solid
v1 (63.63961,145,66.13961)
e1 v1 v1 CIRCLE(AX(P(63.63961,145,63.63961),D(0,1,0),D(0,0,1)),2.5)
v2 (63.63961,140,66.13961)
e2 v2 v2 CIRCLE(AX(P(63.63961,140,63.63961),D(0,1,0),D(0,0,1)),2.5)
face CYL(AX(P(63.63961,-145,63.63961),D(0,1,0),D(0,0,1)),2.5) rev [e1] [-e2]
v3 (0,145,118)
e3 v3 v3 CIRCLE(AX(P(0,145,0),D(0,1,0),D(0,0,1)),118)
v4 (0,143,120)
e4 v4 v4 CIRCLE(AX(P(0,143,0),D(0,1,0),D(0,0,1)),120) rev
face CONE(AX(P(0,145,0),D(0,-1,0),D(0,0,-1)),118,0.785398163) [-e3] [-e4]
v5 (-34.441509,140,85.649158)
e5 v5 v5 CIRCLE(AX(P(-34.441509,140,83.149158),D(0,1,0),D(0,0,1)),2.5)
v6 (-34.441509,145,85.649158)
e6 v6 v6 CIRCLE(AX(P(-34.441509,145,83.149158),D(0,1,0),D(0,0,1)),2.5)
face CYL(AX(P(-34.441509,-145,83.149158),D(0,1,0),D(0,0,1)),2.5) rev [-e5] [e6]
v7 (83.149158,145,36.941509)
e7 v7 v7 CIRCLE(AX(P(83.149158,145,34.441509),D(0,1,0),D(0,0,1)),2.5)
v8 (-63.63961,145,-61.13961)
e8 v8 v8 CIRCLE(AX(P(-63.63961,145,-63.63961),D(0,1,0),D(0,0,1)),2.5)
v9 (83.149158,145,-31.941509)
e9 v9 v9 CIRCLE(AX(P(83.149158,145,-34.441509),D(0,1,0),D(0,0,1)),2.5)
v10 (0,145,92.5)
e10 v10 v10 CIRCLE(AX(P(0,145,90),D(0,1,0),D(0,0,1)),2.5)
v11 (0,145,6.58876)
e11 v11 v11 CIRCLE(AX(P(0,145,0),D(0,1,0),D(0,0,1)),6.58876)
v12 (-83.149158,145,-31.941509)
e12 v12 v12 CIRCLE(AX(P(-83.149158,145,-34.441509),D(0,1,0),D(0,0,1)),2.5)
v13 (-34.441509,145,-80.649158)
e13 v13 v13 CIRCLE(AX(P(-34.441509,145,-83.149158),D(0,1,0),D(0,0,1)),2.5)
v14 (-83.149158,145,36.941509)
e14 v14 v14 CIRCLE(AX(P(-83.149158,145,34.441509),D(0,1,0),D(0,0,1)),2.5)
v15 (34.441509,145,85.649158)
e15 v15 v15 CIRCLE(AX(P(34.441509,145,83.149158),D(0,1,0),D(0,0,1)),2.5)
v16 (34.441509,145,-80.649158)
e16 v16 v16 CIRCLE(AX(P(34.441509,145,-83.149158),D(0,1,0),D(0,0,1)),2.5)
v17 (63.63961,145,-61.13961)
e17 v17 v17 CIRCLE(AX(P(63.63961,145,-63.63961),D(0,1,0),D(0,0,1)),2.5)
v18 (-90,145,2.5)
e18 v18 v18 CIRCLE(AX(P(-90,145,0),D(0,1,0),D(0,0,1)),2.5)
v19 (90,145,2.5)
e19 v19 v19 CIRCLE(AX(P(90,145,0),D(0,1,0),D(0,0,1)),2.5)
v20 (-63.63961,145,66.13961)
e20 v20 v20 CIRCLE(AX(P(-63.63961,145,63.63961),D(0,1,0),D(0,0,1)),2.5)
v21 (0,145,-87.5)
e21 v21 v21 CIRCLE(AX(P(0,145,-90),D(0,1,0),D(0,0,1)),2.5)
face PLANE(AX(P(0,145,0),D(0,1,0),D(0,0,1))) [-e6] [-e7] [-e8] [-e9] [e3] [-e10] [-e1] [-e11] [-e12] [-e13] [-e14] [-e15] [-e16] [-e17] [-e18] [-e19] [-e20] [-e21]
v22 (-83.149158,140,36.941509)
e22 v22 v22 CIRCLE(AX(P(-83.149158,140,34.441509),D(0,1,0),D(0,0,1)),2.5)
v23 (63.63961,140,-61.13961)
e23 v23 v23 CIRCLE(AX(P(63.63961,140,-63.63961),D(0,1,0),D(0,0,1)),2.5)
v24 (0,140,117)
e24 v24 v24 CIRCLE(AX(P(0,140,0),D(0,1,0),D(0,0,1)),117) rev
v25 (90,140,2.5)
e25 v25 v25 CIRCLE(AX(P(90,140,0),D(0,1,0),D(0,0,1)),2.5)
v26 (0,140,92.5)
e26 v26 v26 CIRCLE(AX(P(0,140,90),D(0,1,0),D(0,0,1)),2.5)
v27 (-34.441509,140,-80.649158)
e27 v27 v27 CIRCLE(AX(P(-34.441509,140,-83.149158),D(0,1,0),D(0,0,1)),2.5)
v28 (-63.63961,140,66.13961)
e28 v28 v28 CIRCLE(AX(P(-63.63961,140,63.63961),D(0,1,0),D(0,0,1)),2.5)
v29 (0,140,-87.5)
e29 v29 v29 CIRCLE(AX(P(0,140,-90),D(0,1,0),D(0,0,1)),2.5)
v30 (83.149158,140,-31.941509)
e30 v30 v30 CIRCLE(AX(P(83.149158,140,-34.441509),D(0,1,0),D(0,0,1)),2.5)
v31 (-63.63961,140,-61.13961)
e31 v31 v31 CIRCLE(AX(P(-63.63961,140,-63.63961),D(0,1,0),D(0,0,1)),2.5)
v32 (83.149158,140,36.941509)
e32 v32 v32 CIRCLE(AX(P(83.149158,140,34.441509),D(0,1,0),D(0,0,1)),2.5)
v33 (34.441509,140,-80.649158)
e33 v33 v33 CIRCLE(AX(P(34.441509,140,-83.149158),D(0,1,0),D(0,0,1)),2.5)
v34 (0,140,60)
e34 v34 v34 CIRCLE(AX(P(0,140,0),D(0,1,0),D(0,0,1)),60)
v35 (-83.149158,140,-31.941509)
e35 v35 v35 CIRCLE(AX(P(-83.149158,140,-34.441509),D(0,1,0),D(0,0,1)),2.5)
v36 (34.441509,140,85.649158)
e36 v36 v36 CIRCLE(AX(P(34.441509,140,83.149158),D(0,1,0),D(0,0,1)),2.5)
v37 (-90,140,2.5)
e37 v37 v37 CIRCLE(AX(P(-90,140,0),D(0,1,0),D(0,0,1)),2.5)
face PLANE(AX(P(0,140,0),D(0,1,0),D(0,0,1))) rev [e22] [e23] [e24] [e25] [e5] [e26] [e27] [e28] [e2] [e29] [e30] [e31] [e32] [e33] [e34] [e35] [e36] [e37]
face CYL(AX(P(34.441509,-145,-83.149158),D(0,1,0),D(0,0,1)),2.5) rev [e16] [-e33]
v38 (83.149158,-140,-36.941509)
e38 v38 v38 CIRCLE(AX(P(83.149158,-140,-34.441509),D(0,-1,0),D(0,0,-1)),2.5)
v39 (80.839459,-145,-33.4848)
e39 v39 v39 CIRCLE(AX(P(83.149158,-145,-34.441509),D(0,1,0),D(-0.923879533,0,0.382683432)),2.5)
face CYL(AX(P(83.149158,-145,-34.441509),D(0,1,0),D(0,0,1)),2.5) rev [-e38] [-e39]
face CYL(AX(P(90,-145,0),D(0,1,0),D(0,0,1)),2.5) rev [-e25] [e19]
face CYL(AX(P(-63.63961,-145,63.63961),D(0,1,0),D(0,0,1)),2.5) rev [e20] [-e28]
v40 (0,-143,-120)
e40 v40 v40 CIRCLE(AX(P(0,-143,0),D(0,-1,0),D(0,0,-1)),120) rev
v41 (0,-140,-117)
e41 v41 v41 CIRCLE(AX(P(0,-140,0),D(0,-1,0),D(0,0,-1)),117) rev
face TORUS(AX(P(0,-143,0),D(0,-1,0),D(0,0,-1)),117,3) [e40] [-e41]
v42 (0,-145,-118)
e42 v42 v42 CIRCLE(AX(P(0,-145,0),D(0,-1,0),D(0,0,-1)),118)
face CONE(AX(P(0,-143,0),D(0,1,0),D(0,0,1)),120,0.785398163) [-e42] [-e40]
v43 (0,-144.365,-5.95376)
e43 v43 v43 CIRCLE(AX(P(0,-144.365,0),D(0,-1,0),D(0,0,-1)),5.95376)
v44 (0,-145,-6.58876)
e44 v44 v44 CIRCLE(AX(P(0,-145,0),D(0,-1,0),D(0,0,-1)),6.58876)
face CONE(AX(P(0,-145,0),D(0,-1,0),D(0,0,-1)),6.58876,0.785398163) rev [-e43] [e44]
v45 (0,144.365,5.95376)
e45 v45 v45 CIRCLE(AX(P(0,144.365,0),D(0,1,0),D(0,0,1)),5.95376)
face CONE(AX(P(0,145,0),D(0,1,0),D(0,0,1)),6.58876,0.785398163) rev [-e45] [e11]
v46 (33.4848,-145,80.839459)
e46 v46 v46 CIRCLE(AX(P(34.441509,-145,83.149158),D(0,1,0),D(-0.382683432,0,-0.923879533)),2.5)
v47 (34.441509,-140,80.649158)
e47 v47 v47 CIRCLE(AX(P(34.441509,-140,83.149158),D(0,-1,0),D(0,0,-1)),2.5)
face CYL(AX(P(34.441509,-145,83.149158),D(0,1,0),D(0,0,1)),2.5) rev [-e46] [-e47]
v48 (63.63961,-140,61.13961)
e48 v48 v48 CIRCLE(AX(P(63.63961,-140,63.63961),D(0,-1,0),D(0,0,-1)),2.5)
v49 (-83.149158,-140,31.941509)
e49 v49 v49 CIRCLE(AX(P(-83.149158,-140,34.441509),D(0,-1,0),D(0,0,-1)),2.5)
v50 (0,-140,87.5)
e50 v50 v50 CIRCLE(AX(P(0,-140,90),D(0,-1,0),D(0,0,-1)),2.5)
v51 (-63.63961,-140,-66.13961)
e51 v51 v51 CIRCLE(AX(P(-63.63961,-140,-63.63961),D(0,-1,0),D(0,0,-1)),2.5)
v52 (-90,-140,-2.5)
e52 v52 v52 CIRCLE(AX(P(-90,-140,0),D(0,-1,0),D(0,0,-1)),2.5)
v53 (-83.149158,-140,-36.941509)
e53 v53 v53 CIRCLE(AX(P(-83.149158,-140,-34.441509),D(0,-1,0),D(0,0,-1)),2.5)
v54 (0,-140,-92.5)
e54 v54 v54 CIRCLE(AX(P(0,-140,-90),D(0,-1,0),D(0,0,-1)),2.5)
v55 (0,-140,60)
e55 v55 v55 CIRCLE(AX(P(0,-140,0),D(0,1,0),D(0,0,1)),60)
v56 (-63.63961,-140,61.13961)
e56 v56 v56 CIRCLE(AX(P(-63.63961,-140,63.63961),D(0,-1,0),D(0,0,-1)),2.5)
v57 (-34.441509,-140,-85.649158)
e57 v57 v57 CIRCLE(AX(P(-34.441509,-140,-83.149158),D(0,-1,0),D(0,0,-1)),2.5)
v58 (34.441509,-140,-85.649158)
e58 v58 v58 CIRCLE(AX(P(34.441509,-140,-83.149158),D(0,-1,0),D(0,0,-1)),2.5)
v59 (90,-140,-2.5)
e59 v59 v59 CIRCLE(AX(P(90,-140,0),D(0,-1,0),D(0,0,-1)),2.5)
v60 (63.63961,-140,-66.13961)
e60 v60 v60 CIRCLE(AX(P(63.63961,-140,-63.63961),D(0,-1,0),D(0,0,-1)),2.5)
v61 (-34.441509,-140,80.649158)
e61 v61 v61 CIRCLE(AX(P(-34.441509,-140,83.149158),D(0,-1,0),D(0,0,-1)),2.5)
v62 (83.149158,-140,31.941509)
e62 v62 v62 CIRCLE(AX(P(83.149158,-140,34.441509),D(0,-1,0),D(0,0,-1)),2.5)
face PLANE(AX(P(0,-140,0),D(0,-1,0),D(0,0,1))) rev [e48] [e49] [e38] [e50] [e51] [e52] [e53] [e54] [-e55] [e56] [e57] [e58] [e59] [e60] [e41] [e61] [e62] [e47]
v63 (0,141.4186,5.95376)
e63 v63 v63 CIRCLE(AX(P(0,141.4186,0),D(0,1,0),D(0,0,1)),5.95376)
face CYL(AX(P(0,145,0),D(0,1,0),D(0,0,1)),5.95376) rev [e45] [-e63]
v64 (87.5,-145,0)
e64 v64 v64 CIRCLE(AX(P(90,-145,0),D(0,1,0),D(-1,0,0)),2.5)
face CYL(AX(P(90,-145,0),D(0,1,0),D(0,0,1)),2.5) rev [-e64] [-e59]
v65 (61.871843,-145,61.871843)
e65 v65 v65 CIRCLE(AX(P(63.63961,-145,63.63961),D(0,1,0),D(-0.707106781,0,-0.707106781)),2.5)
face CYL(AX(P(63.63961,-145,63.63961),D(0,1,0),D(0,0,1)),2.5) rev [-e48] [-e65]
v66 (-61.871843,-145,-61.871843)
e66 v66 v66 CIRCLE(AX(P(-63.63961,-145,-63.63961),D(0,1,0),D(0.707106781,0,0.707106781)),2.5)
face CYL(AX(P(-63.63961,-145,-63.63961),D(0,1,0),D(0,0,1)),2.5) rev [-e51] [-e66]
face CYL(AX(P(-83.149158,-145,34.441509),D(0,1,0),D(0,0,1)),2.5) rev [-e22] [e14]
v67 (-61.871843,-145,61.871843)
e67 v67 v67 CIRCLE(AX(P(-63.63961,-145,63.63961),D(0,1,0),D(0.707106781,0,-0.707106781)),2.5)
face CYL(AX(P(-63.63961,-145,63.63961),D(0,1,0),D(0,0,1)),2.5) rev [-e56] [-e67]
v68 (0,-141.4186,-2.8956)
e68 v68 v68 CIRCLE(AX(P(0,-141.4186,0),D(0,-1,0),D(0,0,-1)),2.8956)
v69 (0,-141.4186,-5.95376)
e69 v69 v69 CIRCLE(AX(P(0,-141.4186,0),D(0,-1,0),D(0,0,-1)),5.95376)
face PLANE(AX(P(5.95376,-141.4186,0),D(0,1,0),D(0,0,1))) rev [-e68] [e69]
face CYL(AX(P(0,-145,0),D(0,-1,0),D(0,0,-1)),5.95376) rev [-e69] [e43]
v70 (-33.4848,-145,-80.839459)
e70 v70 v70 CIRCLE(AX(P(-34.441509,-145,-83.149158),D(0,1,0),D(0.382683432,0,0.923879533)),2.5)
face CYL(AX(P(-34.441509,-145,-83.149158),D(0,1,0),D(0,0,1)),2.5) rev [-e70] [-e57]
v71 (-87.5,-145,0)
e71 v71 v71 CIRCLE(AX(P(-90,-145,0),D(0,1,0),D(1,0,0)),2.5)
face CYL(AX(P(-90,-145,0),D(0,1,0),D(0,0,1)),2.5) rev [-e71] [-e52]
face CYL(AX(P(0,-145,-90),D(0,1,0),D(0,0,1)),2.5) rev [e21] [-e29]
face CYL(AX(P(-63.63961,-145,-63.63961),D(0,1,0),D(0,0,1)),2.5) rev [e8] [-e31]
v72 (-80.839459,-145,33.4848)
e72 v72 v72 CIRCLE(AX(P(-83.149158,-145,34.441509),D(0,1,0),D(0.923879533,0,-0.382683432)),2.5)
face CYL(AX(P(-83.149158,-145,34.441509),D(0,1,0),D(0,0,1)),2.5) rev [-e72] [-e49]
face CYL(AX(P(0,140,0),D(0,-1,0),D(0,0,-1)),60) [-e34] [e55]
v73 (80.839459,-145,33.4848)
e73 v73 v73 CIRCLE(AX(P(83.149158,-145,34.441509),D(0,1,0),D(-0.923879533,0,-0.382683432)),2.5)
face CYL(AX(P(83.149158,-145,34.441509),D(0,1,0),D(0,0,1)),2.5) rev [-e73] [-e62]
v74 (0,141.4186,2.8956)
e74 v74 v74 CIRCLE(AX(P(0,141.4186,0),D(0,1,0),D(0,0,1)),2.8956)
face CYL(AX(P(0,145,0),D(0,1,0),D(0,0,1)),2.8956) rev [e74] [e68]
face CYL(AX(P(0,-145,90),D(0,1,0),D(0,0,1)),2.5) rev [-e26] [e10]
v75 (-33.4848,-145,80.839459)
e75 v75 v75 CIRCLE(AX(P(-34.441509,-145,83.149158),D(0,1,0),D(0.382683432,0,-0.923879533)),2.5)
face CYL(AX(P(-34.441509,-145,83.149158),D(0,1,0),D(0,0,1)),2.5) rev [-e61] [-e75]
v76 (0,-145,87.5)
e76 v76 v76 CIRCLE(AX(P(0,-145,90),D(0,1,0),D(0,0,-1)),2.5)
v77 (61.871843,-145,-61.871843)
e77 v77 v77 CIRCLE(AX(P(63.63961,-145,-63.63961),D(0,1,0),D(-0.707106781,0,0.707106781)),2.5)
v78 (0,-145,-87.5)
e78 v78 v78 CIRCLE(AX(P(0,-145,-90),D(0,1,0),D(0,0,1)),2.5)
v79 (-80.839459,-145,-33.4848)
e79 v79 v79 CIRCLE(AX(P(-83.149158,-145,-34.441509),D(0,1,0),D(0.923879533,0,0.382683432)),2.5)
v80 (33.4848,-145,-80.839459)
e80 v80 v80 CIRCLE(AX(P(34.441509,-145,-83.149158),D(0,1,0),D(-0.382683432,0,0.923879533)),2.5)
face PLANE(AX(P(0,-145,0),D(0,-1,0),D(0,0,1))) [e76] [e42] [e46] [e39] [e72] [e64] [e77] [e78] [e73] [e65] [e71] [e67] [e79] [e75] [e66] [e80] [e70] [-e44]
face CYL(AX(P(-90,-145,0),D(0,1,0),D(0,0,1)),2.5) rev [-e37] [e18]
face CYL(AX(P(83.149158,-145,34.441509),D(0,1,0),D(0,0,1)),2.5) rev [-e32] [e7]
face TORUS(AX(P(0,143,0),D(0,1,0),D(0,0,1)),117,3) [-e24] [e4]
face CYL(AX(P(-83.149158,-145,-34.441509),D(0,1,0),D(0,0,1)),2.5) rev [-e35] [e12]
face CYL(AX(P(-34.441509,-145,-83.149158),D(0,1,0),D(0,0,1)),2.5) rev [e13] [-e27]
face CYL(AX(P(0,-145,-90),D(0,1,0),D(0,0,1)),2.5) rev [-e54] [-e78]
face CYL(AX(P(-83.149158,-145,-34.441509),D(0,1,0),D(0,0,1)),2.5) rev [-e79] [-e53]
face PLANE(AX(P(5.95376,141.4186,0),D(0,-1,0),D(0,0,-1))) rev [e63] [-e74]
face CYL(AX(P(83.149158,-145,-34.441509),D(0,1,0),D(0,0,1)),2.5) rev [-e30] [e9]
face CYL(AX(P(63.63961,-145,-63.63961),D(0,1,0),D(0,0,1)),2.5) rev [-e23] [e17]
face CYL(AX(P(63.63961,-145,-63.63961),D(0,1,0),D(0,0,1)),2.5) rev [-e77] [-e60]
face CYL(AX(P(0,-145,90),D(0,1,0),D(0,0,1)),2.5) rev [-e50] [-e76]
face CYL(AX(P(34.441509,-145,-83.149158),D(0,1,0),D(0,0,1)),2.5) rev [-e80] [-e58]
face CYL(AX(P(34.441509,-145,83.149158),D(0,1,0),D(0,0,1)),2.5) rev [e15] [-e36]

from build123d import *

# Parameters (mm, degrees)
SKETCH1_R                = 60
BOSS_EXTRUDE1_DEPTH      = 140
SKETCH3_R                = 120
BOSS_EXTRUDE2_DEPTH      = 5
CHAMFER1_SIZE            = 2
FILLET1_R                = 3
CHAMFER1_OF_MIRROR8_SIZE = 2
FILLET1_OF_MIRROR8_R     = 3
SKETCH4_R                = 2.5
CUT_EXTRUDE1_DEPTH       = 337.005952328
CIRPATTERN1_COUNT        = 16


with BuildPart() as part:
    # Sketch1 → Boss-Extrude1 (new, symmetric)
    with BuildSketch(Plane(origin=(0, 0, 0), x_dir=(1, 0, 0), z_dir=(0, 1, 0))):
        with Locations(Location((0, 0, 0), (0, 0, 270))):
            Circle(SKETCH1_R)
    extrude(amount=BOSS_EXTRUDE1_DEPTH, both=True)

    # Sketch3 → Boss-Extrude2 (add)
    with BuildSketch(Plane(origin=(0, 140, 0), x_dir=(1, 0, 0), z_dir=(0, 1, 0))):
        with Locations(Location((0, 0, 0), (0, 0, 270))):
            Circle(SKETCH3_R)
    boss_extrude2 = extrude(amount=BOSS_EXTRUDE2_DEPTH)

    # Chamfer1
    chamfer1_edges = [part.edges().sort_by_distance(p)[0] for p in [
        (0, 145, -120),
    ]]
    chamfer(chamfer1_edges, length=CHAMFER1_SIZE)

    # Fillet1
    fillet1_edges = [part.edges().sort_by_distance(p)[0] for p in [
        (0, 140, -120),
    ]]
    fillet(fillet1_edges, radius=FILLET1_R - 0.0001)  # a hair under: the kernel refuses the full size

    # Sketch8 → CBORE for #12 Binding Head Machine Screw2 (revolve, cut)
    with BuildSketch(Plane(origin=(0, 145, 0), x_dir=(0, 0, 1), z_dir=(1, 0, 0))):
        Polygon((0, 0), (0, 290), (2.8956, 290), (2.8956, 3.5814), (5.95376, 3.5814), (5.95376, 0.635), (6.58876, 0), align=None)
    cbore_for_12_binding_head_machine_screw = revolve(axis=Axis((0, 151.35, 0), (0, -1, 0)), mode=Mode.SUBTRACT)

    # Mirror8: Boss-Extrude2, CBORE for #12 Binding Head Machine Screw2 across plane
    add(boss_extrude2.mirror(Plane.ZX))
    add(cbore_for_12_binding_head_machine_screw.mirror(Plane.ZX), mode=Mode.SUBTRACT)

    # Chamfer1 of Mirror8
    chamfer1_of_mirror8_edges = [part.edges().sort_by_distance(p)[0] for p in [
        (0, -145, -120),
    ]]
    chamfer(chamfer1_of_mirror8_edges, length=CHAMFER1_OF_MIRROR8_SIZE)

    # Fillet1 of Mirror8
    fillet1_of_mirror8_edges = [part.edges().sort_by_distance(p)[0] for p in [
        (0, -140, -120),
    ]]
    fillet(fillet1_of_mirror8_edges, radius=FILLET1_OF_MIRROR8_R - 0.0001)  # a hair under: the kernel refuses the full size

    # Sketch4 → Cut-Extrude1 (cut, symmetric)
    with BuildSketch(Plane(origin=(0, 145, 0), x_dir=(1, 0, 0), z_dir=(0, 1, 0))):
        with Locations(Location((0, 90, 0), (0, 0, 270))):
            Circle(SKETCH4_R)
    cut_extrude1 = extrude(amount=CUT_EXTRUDE1_DEPTH, both=True, mode=Mode.SUBTRACT)

    # CirPattern1: Cut-Extrude1 ×16 about axis
    cirpattern1_axis = Axis((0, 0, 0), (0, 1, 0))
    for i in range(1, CIRPATTERN1_COUNT):
        add(cut_extrude1.rotate(cirpattern1_axis, i * 360 / CIRPATTERN1_COUNT), mode=Mode.SUBTRACT)


solid = part.part
